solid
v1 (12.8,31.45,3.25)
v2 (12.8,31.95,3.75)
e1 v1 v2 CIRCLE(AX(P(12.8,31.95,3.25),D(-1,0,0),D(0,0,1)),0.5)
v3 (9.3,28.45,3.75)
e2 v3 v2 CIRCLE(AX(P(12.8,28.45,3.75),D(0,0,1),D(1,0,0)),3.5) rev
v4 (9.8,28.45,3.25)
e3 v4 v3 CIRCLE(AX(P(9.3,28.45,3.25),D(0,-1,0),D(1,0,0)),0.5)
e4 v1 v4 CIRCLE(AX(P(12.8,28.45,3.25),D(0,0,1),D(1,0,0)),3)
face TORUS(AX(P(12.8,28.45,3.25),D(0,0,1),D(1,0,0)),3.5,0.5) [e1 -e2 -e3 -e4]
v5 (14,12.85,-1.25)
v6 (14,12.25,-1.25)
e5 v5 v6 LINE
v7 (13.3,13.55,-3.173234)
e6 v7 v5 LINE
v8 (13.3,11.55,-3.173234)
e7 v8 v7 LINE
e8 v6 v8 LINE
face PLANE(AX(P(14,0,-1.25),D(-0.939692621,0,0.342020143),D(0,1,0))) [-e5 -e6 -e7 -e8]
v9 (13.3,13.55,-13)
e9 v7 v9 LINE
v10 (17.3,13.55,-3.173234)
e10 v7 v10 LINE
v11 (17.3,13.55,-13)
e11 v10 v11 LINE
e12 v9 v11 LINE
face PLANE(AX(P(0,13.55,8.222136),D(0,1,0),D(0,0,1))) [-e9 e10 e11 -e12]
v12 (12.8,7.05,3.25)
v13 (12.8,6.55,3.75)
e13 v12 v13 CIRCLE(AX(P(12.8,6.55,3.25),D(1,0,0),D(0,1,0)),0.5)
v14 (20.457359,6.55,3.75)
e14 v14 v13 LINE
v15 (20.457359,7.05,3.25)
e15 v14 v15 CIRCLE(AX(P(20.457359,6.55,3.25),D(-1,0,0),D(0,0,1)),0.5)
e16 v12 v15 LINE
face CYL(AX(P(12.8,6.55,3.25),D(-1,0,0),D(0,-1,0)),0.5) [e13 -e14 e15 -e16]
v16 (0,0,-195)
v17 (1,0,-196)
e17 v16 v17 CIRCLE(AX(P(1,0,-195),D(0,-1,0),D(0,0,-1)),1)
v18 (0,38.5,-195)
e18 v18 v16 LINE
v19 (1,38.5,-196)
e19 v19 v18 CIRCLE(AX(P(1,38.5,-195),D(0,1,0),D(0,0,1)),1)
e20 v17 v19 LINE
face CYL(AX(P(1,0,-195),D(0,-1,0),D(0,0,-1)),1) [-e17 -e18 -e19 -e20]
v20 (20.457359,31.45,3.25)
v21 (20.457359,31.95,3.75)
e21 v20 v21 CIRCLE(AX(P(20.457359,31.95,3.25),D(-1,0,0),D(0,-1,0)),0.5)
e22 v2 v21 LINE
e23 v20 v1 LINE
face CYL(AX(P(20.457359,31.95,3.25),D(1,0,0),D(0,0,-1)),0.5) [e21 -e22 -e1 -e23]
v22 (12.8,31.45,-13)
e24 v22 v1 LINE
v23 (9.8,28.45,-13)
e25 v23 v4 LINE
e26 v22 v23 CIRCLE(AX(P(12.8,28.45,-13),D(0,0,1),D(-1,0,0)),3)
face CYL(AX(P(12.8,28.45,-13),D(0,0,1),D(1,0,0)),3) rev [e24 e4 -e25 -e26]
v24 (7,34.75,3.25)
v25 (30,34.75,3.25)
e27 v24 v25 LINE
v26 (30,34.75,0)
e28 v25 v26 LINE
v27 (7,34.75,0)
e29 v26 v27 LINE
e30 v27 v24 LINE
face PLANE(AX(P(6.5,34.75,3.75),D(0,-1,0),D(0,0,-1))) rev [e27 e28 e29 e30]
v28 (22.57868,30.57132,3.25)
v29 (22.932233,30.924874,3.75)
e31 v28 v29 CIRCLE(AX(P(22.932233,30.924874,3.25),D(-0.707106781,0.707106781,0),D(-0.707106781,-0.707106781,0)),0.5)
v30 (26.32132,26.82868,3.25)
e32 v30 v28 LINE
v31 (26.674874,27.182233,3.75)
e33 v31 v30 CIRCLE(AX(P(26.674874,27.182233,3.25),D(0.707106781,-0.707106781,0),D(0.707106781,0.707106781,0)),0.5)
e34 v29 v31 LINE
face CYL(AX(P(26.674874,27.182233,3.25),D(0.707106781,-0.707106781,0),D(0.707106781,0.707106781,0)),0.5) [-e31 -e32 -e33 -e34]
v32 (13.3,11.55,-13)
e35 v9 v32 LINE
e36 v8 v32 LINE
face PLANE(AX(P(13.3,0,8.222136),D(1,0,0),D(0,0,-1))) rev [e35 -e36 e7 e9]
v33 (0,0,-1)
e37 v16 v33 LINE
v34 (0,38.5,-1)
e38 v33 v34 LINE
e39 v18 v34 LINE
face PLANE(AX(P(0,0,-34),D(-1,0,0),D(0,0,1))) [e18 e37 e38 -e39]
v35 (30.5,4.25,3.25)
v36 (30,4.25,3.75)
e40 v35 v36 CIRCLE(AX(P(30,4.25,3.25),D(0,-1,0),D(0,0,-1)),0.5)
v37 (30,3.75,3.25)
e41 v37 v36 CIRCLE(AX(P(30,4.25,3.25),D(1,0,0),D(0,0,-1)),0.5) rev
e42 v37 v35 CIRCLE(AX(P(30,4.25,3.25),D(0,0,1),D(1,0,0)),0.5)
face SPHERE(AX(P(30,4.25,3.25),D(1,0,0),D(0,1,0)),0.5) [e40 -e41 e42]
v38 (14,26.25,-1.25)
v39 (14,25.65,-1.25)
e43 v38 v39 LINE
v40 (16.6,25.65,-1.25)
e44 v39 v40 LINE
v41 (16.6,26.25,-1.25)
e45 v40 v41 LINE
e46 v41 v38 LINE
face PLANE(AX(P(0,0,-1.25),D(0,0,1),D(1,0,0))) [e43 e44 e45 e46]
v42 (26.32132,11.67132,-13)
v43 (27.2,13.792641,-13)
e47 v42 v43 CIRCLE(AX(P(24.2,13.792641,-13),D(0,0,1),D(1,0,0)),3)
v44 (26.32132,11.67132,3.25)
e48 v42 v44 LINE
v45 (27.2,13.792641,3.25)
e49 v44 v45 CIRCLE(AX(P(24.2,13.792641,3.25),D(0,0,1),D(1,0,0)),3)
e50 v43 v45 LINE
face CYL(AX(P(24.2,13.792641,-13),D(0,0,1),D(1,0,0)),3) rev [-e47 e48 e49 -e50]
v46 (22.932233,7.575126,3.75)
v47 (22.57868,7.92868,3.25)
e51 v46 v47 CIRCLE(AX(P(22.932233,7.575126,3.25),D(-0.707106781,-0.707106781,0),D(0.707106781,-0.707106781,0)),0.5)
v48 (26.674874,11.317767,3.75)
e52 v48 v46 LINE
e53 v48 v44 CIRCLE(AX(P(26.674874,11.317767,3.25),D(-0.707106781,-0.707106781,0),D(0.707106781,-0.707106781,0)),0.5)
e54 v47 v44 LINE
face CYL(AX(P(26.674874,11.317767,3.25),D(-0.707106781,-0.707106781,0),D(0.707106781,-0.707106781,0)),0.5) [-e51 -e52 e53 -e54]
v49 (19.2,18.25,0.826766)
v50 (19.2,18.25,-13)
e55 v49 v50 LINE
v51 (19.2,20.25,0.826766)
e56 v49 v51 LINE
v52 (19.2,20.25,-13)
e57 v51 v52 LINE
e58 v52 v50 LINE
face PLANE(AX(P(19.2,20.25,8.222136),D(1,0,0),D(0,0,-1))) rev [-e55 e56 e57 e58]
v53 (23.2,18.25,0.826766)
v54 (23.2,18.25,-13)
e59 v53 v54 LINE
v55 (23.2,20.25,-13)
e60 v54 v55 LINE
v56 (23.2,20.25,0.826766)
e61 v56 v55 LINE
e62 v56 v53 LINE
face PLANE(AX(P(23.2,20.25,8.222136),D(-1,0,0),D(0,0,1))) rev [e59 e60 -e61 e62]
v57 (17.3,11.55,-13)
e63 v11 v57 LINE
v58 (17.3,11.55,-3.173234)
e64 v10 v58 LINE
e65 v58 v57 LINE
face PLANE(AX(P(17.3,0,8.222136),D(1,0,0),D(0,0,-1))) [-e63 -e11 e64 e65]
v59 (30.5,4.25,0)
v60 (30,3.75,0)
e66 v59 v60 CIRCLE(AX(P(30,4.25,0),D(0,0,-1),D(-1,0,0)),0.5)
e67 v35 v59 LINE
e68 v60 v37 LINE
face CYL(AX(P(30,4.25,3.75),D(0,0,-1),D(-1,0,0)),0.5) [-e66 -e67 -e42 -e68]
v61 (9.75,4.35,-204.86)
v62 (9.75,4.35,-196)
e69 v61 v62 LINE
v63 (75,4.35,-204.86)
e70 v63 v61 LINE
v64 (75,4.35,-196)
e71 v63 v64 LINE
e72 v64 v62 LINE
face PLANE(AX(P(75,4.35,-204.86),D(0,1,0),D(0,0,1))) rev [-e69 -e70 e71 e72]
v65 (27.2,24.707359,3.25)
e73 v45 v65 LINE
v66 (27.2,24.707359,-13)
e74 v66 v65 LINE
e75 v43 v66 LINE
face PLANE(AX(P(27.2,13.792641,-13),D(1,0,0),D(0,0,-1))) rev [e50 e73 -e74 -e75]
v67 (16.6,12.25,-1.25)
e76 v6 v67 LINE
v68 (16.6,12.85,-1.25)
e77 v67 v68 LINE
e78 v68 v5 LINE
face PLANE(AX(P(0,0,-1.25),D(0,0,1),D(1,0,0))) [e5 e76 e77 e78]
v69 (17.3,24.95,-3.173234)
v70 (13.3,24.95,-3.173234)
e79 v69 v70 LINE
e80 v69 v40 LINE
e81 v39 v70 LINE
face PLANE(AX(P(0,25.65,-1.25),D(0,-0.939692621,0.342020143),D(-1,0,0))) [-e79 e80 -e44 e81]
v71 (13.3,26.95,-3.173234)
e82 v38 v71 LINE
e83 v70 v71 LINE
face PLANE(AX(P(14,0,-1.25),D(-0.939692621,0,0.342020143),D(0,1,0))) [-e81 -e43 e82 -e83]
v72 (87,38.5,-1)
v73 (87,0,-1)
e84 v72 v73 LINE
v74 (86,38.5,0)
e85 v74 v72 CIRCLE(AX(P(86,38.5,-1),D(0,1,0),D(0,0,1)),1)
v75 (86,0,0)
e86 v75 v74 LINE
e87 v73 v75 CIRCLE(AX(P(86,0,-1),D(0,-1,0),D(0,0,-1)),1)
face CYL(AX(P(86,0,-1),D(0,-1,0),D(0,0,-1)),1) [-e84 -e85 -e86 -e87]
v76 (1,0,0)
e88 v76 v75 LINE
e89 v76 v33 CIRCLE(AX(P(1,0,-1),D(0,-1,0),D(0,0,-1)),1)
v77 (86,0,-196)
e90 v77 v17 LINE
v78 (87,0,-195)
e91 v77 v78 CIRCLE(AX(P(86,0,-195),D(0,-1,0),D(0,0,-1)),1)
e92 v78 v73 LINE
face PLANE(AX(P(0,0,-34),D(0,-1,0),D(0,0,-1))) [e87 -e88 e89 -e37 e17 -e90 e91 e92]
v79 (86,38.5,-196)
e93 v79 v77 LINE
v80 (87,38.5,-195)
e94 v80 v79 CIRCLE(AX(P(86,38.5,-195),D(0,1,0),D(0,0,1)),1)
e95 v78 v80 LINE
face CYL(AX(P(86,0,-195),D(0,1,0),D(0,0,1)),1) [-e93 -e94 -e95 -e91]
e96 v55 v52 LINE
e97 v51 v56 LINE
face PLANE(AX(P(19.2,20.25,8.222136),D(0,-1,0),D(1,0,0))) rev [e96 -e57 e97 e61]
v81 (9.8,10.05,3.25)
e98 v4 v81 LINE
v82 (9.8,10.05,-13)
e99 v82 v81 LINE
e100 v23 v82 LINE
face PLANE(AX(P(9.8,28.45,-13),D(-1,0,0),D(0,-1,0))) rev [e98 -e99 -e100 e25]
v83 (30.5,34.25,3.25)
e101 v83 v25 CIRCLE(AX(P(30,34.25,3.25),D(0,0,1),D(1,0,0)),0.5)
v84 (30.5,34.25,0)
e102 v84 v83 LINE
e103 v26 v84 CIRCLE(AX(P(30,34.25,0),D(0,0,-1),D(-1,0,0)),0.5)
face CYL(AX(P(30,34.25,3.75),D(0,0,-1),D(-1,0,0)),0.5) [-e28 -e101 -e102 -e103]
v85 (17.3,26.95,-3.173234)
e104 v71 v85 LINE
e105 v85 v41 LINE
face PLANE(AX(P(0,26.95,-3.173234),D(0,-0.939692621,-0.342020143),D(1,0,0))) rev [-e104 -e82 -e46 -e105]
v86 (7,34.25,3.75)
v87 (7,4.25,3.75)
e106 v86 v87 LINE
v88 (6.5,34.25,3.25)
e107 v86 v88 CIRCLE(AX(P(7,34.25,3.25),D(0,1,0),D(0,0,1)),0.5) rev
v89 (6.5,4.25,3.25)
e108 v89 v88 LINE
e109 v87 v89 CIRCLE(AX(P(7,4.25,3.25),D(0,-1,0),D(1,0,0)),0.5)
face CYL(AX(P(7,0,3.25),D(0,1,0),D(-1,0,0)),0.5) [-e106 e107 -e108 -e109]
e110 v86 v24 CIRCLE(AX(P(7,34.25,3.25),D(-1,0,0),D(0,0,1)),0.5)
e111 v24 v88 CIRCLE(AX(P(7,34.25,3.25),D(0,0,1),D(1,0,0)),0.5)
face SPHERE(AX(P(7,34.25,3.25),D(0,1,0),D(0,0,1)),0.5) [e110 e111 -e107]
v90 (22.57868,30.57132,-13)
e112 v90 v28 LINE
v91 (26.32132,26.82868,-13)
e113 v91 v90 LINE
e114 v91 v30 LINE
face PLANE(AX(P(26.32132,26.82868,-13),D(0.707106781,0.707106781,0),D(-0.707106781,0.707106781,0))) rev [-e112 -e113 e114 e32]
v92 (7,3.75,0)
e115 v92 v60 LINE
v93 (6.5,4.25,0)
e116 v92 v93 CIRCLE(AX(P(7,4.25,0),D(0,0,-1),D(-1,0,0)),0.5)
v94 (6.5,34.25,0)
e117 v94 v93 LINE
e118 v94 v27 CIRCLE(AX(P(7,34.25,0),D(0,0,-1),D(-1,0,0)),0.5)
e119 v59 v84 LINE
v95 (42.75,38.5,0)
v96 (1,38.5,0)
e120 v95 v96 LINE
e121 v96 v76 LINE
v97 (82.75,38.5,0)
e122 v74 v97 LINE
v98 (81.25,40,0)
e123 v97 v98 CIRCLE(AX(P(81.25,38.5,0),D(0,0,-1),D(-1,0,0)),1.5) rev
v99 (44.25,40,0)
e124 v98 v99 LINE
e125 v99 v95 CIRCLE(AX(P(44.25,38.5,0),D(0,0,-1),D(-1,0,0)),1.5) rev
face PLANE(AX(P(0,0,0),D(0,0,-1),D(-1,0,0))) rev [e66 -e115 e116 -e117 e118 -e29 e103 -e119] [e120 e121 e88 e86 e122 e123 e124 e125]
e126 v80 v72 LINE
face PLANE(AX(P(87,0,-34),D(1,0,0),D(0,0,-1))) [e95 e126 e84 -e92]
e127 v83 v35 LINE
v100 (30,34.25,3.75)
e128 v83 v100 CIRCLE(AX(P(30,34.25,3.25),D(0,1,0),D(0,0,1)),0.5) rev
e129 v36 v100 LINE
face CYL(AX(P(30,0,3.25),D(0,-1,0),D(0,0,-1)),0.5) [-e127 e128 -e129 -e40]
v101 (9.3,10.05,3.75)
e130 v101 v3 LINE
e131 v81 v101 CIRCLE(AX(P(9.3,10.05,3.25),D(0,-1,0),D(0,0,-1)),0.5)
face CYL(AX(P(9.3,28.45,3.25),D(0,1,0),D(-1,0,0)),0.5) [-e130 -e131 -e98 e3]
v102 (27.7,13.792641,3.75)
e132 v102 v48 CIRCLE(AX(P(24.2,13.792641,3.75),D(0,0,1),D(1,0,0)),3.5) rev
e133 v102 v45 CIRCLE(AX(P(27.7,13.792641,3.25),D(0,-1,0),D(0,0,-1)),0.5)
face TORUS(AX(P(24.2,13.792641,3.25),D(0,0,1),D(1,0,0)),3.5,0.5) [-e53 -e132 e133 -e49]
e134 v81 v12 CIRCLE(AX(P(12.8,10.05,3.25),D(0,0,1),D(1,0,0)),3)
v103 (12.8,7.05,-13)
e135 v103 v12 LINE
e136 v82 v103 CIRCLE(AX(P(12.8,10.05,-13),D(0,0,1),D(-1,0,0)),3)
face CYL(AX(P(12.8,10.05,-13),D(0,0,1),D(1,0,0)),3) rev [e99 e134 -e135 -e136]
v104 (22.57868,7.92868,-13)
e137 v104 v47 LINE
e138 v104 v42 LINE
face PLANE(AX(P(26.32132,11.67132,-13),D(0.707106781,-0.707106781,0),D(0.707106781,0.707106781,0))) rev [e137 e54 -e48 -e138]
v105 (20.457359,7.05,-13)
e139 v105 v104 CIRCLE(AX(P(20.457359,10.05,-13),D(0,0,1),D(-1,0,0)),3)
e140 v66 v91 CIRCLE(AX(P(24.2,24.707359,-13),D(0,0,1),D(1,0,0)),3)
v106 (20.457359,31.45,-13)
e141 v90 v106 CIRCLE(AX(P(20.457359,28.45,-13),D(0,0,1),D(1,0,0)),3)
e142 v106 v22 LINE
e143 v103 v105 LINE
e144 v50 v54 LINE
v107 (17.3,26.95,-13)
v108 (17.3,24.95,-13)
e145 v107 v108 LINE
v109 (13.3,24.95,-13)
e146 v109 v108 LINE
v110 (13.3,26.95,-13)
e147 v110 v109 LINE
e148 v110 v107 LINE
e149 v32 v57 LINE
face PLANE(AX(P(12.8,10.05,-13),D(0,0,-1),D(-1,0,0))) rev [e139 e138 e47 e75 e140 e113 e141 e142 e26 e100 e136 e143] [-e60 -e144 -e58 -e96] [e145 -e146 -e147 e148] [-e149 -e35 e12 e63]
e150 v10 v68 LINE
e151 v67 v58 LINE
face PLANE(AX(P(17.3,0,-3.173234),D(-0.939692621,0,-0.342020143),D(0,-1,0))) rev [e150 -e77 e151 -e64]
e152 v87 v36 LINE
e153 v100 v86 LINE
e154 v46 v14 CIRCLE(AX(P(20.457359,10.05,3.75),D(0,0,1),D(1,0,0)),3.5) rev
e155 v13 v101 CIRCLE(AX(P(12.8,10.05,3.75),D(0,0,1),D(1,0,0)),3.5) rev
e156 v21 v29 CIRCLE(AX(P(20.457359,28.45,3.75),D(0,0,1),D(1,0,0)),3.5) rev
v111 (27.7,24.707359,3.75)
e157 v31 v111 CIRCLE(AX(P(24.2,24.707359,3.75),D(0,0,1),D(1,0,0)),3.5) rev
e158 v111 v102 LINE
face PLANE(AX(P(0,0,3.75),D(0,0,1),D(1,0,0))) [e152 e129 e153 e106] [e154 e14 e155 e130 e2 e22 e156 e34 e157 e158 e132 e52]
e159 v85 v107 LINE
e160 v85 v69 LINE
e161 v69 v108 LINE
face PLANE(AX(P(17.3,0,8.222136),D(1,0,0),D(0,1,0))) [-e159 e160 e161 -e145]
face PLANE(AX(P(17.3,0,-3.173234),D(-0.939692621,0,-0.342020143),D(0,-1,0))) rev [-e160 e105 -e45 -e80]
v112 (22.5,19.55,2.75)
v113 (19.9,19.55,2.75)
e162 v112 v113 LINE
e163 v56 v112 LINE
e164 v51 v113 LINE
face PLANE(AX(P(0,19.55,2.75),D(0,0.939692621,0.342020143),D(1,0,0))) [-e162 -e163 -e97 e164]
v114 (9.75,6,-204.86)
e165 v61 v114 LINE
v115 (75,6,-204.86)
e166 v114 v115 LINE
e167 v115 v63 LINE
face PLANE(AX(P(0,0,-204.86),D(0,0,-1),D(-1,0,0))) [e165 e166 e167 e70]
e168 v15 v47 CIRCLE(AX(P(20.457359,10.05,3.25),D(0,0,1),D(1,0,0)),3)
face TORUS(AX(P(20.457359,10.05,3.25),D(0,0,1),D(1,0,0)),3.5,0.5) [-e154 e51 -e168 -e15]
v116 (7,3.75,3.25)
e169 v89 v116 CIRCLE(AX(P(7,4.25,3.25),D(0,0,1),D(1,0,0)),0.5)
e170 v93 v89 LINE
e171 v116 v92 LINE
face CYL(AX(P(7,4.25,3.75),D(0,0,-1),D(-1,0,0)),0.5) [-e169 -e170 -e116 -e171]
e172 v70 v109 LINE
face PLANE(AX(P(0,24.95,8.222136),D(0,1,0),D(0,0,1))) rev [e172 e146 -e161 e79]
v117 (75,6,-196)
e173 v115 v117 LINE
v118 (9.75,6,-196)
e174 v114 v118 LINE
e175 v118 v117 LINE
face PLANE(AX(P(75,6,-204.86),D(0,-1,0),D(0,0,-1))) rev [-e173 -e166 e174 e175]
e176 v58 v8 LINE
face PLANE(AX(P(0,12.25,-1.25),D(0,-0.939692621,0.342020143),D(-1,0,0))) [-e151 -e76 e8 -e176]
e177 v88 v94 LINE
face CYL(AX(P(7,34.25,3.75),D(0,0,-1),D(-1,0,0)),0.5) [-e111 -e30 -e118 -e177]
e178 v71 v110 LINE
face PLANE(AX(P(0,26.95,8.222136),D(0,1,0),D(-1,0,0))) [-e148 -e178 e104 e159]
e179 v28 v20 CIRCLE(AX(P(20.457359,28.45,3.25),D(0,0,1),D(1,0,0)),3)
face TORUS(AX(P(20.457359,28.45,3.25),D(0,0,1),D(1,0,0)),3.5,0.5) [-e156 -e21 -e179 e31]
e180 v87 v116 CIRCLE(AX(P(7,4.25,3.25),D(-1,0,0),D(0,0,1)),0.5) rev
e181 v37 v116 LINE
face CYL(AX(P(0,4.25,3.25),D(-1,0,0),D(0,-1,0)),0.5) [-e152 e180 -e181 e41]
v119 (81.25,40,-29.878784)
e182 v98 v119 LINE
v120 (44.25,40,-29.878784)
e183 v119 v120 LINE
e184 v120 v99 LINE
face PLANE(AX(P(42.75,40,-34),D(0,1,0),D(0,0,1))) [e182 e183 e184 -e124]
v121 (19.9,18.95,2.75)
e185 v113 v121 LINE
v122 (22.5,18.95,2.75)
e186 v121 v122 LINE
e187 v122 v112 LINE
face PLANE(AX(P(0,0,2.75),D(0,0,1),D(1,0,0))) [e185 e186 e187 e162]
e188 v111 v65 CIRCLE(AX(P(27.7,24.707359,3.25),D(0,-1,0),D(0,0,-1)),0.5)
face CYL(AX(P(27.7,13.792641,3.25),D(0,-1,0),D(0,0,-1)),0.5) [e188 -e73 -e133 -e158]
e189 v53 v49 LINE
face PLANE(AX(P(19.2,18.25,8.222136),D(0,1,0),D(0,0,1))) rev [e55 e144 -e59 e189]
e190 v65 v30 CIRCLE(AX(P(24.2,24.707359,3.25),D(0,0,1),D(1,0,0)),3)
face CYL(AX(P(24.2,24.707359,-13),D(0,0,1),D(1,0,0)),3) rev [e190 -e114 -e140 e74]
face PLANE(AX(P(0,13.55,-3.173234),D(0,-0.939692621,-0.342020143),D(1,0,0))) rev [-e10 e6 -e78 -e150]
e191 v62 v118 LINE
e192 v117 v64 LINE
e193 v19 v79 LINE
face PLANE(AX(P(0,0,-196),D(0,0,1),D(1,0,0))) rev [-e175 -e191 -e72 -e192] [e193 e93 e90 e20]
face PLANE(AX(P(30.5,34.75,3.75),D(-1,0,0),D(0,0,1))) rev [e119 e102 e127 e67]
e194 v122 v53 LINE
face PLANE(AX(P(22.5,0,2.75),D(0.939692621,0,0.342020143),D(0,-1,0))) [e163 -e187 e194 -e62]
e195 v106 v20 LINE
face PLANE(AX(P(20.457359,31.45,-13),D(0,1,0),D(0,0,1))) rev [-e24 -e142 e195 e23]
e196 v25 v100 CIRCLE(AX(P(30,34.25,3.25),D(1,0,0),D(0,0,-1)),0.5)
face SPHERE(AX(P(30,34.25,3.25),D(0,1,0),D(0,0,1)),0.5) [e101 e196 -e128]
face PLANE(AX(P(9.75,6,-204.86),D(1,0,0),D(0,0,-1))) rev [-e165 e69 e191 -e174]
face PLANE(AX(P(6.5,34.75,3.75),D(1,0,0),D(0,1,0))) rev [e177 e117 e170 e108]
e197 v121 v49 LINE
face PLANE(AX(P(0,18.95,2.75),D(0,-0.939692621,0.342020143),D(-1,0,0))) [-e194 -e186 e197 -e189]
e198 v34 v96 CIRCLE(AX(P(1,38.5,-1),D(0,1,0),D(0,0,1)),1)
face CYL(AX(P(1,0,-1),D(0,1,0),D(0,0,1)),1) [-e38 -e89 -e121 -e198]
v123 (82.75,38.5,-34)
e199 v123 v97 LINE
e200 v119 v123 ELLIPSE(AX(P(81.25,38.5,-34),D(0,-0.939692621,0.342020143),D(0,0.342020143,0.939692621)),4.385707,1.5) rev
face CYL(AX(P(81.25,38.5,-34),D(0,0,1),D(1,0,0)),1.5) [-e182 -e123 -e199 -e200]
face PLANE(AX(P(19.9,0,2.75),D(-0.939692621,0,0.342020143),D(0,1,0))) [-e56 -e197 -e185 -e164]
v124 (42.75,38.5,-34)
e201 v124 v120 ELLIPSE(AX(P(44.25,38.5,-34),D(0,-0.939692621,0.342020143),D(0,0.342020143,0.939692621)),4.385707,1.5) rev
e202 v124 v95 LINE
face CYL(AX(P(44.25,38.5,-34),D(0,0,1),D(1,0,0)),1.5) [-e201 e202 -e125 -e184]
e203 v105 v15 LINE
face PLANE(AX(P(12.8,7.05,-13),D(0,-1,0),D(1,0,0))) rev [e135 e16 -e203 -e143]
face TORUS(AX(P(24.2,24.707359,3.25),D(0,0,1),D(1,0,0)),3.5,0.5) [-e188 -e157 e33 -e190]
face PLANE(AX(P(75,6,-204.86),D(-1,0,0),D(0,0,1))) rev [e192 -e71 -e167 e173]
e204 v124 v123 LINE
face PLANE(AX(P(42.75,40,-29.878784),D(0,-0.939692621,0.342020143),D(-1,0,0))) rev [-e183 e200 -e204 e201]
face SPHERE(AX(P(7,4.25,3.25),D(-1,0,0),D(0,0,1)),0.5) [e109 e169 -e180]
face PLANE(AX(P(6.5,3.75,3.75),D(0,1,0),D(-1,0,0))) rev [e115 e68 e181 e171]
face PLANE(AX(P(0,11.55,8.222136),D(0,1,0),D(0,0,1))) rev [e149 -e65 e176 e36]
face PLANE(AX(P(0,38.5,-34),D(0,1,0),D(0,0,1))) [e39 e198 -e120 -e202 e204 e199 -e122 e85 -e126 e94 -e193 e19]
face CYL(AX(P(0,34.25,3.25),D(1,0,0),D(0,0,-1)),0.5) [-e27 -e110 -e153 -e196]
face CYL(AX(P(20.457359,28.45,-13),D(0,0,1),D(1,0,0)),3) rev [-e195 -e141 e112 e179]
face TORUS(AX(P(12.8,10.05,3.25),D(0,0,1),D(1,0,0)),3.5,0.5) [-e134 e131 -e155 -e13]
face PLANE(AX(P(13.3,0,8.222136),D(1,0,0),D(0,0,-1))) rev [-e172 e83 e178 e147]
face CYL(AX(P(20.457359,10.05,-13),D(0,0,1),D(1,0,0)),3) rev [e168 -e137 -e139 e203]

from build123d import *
from OCP.BRepFilletAPI import BRepFilletAPI_MakeChamfer

# Parameters (mm, degrees)
BOSS_EXTRUDE1_DEPTH = 34
SKETCH2_W           = 87
SKETCH2_H           = 38.5
BOSS_EXTRUDE2_DEPTH = 162
SKETCH3_W           = 65.25
SKETCH3_H           = 1.65
BOSS_EXTRUDE3_DEPTH = 8.86
FILLET1_R           = 1
CHAMFER1_SIZE2      = 1.5
CHAMFER1_SIZE       = 4.121216129
FILLET2_R           = 1.5
SKETCH4_W           = 24
SKETCH4_H           = 31
BOSS_EXTRUDE4_DEPTH = 3.75
CUT_EXTRUDE1_DEPTH  = 16.75
SKETCH6_W           = 4
SKETCH6_H           = 2
BOSS_EXTRUDE5_DEPTH = 11.75
SKETCH7_W           = 4
SKETCH7_H           = 2
BOSS_EXTRUDE6_DEPTH = 15.75
CHAMFER2_SIZE       = 0.7
CHAMFER2_SIZE2      = 1.923234194
FILLET3_R           = 0.5


with BuildPart() as part:
    # Sketch1 → Boss-Extrude1 (new body)
    with BuildSketch(Plane.XY):
        Polygon((42.75, 40), (82.75, 40), (82.75, 38.5), (87, 38.5), (87, 0), (0, 0), (0, 38.5), (42.75, 38.5), align=None)
    extrude(amount=-BOSS_EXTRUDE1_DEPTH)

    # Sketch2 → Boss-Extrude2 (add)
    with BuildSketch(Plane(origin=(0, 0, -34), x_dir=(-1, 0, 0), z_dir=(0, 0, -1))):
        with Locations((-43.5, 19.25)):
            Rectangle(SKETCH2_W, SKETCH2_H)
    extrude(amount=BOSS_EXTRUDE2_DEPTH)

    # Sketch3 → Boss-Extrude3 (add)
    with BuildSketch(Plane(origin=(0, 0, -196), x_dir=(-1, 0, 0), z_dir=(0, 0, -1))):
        with Locations((-42.375, 5.175)):
            Rectangle(SKETCH3_W, SKETCH3_H)
    extrude(amount=BOSS_EXTRUDE3_DEPTH)

    # Fillet1
    fillet1_edges = [part.edges().sort_by_distance(p)[0] for p in [
        (87, 19.25, 0),
        (0, 19.25, 0),
        (0, 19.25, -196),
        (87, 19.25, -196),
    ]]
    fillet(fillet1_edges, radius=FILLET1_R)

    # Chamfer1
    chamfer1_edges = [part.edges().sort_by_distance(p)[0] for p in [
        (62.75, 40, -34),
    ]]
    chamfer1_side = [part.faces().sort_by_distance(p)[0] for p in [
        (62.75, 40, -33.97),
    ]]
    chamfer(chamfer1_edges, length=CHAMFER1_SIZE - 0.0001, length2=CHAMFER1_SIZE2 - 0.0001, reference=chamfer1_side[0])  # a hair under: the kernel refuses the full size

    # Fillet2
    fillet2_edges = [part.edges().sort_by_distance(p)[0] for p in [
        (42.75, 40, -14.939441935),
        (82.75, 40, -14.939441935),
    ]]
    fillet(fillet2_edges, radius=FILLET2_R - 0.0001)  # a hair under: the kernel refuses the full size

    # Sketch4 → Boss-Extrude4 (add)
    with BuildSketch(Plane.XY):
        with Locations((18.5, 19.25)):
            Rectangle(SKETCH4_W, SKETCH4_H)
    extrude(amount=BOSS_EXTRUDE4_DEPTH)

    # Sketch5 → Cut-Extrude1 (cut)
    with BuildSketch(Plane.XY.offset(3.75)):
        with BuildLine():
            Line((27.2, 13.792640687), (27.2, 24.707359313))
            ThreePointArc((27.2, 24.707359313), (26.971638598, 25.85540961), (26.321320344, 26.828679656))
            Line((26.321320344, 26.828679656), (22.578679656, 30.571320344))
            ThreePointArc((22.578679656, 30.571320344), (21.60540961, 31.221638598), (20.457359313, 31.45))
            Line((20.457359313, 31.45), (12.8, 31.45))
            ThreePointArc((12.8, 31.45), (10.678679656, 30.571320344), (9.8, 28.45))
            Line((9.8, 28.45), (9.8, 10.05))
            ThreePointArc((9.8, 10.05), (10.678679656, 7.928679656), (12.8, 7.05))
            Line((12.8, 7.05), (20.457359313, 7.05))
            ThreePointArc((20.457359313, 7.05), (21.60540961, 7.278361402), (22.578679656, 7.928679656))
            Line((22.578679656, 7.928679656), (26.321320344, 11.671320344))
            ThreePointArc((26.321320344, 11.671320344), (26.971638598, 12.64459039), (27.2, 13.792640687))
        make_face()
    extrude(amount=-CUT_EXTRUDE1_DEPTH, mode=Mode.SUBTRACT)

    # Sketch6 → Boss-Extrude5 (add)
    with BuildSketch(Plane.XY.offset(-13)):
        with Locations((15.3, 25.95)):
            Rectangle(SKETCH6_W, SKETCH6_H)
        with Locations((15.3, 12.55)):
            Rectangle(SKETCH6_W, SKETCH6_H)
    extrude(amount=BOSS_EXTRUDE5_DEPTH)

    # Sketch7 → Boss-Extrude6 (add)
    with BuildSketch(Plane.XY.offset(-13)):
        with Locations((21.2, 19.25)):
            Rectangle(SKETCH7_W, SKETCH7_H)
    extrude(amount=BOSS_EXTRUDE6_DEPTH)

    # Chamfer2: one chamfer whose edges measure the first distance from different faces: ONE call of the kernel's chamfer builder (chamfer() names one face for all edges)
    chamfer2_edges_1 = [part.edges().sort_by_distance(p)[0] for p in [
        (17.3, 25.95, -1.25),
        (15.3, 26.95, -1.25),
        (13.3, 25.95, -1.25),
        (15.3, 24.95, -1.25),
    ]]
    chamfer2_side_1 = [part.faces().sort_by_distance(p)[0] for p in [
        (15.3, 25.95, -1.25),
    ]]
    chamfer2_edges_2 = [part.edges().sort_by_distance(p)[0] for p in [
        (17.3, 12.55, -1.25),
        (15.3, 13.55, -1.25),
        (13.3, 12.55, -1.25),
        (15.3, 11.55, -1.25),
    ]]
    chamfer2_side_2 = [part.faces().sort_by_distance(p)[0] for p in [
        (15.3, 12.55, -1.25),
    ]]
    chamfer2_edges_3 = [part.edges().sort_by_distance(p)[0] for p in [
        (21.2, 18.25, 2.75),
        (23.2, 19.25, 2.75),
        (21.2, 20.25, 2.75),
        (19.2, 19.25, 2.75),
    ]]
    chamfer2_side_3 = [part.faces().sort_by_distance(p)[0] for p in [
        (21.2, 19.25, 2.75),
    ]]
    chamfer2 = BRepFilletAPI_MakeChamfer(part.part.solid().wrapped)
    for e in chamfer2_edges_1:
        chamfer2.Add(CHAMFER2_SIZE, CHAMFER2_SIZE2, e.wrapped, chamfer2_side_1[0].wrapped)  # the first distance lies on this face
    for e in chamfer2_edges_2:
        chamfer2.Add(CHAMFER2_SIZE, CHAMFER2_SIZE2, e.wrapped, chamfer2_side_2[0].wrapped)  # the first distance lies on this face
    for e in chamfer2_edges_3:
        chamfer2.Add(CHAMFER2_SIZE, CHAMFER2_SIZE2, e.wrapped, chamfer2_side_3[0].wrapped)  # the first distance lies on this face
    add(Compound.cast(chamfer2.Shape()), mode=Mode.REPLACE)

    # Fillet3
    fillet3_edges = [part.edges().sort_by_distance(p)[0] for p in [
        (30.5, 3.75, 1.875),
        (30.5, 34.75, 1.875),
        (6.5, 34.75, 1.875),
        (6.5, 3.75, 1.875),
        (30.5, 19.25, 3.75),
        (18.5, 34.75, 3.75),
        (6.5, 19.25, 3.75),
        (18.5, 3.75, 3.75),
        (10.678679656, 7.928679656, 3.75),
        (16.628679656, 7.05, 3.75),
        (21.60540961, 7.278361402, 3.75),
        (24.45, 9.8, 3.75),
        (26.971638598, 12.64459039, 3.75),
        (27.2, 19.25, 3.75),
        (26.971638598, 25.85540961, 3.75),
        (24.45, 28.7, 3.75),
        (21.60540961, 31.221638598, 3.75),
        (16.628679656, 31.45, 3.75),
        (10.678679656, 30.571320344, 3.75),
        (9.8, 19.25, 3.75),
    ]]
    fillet(fillet3_edges, radius=FILLET3_R)


solid = part.part
